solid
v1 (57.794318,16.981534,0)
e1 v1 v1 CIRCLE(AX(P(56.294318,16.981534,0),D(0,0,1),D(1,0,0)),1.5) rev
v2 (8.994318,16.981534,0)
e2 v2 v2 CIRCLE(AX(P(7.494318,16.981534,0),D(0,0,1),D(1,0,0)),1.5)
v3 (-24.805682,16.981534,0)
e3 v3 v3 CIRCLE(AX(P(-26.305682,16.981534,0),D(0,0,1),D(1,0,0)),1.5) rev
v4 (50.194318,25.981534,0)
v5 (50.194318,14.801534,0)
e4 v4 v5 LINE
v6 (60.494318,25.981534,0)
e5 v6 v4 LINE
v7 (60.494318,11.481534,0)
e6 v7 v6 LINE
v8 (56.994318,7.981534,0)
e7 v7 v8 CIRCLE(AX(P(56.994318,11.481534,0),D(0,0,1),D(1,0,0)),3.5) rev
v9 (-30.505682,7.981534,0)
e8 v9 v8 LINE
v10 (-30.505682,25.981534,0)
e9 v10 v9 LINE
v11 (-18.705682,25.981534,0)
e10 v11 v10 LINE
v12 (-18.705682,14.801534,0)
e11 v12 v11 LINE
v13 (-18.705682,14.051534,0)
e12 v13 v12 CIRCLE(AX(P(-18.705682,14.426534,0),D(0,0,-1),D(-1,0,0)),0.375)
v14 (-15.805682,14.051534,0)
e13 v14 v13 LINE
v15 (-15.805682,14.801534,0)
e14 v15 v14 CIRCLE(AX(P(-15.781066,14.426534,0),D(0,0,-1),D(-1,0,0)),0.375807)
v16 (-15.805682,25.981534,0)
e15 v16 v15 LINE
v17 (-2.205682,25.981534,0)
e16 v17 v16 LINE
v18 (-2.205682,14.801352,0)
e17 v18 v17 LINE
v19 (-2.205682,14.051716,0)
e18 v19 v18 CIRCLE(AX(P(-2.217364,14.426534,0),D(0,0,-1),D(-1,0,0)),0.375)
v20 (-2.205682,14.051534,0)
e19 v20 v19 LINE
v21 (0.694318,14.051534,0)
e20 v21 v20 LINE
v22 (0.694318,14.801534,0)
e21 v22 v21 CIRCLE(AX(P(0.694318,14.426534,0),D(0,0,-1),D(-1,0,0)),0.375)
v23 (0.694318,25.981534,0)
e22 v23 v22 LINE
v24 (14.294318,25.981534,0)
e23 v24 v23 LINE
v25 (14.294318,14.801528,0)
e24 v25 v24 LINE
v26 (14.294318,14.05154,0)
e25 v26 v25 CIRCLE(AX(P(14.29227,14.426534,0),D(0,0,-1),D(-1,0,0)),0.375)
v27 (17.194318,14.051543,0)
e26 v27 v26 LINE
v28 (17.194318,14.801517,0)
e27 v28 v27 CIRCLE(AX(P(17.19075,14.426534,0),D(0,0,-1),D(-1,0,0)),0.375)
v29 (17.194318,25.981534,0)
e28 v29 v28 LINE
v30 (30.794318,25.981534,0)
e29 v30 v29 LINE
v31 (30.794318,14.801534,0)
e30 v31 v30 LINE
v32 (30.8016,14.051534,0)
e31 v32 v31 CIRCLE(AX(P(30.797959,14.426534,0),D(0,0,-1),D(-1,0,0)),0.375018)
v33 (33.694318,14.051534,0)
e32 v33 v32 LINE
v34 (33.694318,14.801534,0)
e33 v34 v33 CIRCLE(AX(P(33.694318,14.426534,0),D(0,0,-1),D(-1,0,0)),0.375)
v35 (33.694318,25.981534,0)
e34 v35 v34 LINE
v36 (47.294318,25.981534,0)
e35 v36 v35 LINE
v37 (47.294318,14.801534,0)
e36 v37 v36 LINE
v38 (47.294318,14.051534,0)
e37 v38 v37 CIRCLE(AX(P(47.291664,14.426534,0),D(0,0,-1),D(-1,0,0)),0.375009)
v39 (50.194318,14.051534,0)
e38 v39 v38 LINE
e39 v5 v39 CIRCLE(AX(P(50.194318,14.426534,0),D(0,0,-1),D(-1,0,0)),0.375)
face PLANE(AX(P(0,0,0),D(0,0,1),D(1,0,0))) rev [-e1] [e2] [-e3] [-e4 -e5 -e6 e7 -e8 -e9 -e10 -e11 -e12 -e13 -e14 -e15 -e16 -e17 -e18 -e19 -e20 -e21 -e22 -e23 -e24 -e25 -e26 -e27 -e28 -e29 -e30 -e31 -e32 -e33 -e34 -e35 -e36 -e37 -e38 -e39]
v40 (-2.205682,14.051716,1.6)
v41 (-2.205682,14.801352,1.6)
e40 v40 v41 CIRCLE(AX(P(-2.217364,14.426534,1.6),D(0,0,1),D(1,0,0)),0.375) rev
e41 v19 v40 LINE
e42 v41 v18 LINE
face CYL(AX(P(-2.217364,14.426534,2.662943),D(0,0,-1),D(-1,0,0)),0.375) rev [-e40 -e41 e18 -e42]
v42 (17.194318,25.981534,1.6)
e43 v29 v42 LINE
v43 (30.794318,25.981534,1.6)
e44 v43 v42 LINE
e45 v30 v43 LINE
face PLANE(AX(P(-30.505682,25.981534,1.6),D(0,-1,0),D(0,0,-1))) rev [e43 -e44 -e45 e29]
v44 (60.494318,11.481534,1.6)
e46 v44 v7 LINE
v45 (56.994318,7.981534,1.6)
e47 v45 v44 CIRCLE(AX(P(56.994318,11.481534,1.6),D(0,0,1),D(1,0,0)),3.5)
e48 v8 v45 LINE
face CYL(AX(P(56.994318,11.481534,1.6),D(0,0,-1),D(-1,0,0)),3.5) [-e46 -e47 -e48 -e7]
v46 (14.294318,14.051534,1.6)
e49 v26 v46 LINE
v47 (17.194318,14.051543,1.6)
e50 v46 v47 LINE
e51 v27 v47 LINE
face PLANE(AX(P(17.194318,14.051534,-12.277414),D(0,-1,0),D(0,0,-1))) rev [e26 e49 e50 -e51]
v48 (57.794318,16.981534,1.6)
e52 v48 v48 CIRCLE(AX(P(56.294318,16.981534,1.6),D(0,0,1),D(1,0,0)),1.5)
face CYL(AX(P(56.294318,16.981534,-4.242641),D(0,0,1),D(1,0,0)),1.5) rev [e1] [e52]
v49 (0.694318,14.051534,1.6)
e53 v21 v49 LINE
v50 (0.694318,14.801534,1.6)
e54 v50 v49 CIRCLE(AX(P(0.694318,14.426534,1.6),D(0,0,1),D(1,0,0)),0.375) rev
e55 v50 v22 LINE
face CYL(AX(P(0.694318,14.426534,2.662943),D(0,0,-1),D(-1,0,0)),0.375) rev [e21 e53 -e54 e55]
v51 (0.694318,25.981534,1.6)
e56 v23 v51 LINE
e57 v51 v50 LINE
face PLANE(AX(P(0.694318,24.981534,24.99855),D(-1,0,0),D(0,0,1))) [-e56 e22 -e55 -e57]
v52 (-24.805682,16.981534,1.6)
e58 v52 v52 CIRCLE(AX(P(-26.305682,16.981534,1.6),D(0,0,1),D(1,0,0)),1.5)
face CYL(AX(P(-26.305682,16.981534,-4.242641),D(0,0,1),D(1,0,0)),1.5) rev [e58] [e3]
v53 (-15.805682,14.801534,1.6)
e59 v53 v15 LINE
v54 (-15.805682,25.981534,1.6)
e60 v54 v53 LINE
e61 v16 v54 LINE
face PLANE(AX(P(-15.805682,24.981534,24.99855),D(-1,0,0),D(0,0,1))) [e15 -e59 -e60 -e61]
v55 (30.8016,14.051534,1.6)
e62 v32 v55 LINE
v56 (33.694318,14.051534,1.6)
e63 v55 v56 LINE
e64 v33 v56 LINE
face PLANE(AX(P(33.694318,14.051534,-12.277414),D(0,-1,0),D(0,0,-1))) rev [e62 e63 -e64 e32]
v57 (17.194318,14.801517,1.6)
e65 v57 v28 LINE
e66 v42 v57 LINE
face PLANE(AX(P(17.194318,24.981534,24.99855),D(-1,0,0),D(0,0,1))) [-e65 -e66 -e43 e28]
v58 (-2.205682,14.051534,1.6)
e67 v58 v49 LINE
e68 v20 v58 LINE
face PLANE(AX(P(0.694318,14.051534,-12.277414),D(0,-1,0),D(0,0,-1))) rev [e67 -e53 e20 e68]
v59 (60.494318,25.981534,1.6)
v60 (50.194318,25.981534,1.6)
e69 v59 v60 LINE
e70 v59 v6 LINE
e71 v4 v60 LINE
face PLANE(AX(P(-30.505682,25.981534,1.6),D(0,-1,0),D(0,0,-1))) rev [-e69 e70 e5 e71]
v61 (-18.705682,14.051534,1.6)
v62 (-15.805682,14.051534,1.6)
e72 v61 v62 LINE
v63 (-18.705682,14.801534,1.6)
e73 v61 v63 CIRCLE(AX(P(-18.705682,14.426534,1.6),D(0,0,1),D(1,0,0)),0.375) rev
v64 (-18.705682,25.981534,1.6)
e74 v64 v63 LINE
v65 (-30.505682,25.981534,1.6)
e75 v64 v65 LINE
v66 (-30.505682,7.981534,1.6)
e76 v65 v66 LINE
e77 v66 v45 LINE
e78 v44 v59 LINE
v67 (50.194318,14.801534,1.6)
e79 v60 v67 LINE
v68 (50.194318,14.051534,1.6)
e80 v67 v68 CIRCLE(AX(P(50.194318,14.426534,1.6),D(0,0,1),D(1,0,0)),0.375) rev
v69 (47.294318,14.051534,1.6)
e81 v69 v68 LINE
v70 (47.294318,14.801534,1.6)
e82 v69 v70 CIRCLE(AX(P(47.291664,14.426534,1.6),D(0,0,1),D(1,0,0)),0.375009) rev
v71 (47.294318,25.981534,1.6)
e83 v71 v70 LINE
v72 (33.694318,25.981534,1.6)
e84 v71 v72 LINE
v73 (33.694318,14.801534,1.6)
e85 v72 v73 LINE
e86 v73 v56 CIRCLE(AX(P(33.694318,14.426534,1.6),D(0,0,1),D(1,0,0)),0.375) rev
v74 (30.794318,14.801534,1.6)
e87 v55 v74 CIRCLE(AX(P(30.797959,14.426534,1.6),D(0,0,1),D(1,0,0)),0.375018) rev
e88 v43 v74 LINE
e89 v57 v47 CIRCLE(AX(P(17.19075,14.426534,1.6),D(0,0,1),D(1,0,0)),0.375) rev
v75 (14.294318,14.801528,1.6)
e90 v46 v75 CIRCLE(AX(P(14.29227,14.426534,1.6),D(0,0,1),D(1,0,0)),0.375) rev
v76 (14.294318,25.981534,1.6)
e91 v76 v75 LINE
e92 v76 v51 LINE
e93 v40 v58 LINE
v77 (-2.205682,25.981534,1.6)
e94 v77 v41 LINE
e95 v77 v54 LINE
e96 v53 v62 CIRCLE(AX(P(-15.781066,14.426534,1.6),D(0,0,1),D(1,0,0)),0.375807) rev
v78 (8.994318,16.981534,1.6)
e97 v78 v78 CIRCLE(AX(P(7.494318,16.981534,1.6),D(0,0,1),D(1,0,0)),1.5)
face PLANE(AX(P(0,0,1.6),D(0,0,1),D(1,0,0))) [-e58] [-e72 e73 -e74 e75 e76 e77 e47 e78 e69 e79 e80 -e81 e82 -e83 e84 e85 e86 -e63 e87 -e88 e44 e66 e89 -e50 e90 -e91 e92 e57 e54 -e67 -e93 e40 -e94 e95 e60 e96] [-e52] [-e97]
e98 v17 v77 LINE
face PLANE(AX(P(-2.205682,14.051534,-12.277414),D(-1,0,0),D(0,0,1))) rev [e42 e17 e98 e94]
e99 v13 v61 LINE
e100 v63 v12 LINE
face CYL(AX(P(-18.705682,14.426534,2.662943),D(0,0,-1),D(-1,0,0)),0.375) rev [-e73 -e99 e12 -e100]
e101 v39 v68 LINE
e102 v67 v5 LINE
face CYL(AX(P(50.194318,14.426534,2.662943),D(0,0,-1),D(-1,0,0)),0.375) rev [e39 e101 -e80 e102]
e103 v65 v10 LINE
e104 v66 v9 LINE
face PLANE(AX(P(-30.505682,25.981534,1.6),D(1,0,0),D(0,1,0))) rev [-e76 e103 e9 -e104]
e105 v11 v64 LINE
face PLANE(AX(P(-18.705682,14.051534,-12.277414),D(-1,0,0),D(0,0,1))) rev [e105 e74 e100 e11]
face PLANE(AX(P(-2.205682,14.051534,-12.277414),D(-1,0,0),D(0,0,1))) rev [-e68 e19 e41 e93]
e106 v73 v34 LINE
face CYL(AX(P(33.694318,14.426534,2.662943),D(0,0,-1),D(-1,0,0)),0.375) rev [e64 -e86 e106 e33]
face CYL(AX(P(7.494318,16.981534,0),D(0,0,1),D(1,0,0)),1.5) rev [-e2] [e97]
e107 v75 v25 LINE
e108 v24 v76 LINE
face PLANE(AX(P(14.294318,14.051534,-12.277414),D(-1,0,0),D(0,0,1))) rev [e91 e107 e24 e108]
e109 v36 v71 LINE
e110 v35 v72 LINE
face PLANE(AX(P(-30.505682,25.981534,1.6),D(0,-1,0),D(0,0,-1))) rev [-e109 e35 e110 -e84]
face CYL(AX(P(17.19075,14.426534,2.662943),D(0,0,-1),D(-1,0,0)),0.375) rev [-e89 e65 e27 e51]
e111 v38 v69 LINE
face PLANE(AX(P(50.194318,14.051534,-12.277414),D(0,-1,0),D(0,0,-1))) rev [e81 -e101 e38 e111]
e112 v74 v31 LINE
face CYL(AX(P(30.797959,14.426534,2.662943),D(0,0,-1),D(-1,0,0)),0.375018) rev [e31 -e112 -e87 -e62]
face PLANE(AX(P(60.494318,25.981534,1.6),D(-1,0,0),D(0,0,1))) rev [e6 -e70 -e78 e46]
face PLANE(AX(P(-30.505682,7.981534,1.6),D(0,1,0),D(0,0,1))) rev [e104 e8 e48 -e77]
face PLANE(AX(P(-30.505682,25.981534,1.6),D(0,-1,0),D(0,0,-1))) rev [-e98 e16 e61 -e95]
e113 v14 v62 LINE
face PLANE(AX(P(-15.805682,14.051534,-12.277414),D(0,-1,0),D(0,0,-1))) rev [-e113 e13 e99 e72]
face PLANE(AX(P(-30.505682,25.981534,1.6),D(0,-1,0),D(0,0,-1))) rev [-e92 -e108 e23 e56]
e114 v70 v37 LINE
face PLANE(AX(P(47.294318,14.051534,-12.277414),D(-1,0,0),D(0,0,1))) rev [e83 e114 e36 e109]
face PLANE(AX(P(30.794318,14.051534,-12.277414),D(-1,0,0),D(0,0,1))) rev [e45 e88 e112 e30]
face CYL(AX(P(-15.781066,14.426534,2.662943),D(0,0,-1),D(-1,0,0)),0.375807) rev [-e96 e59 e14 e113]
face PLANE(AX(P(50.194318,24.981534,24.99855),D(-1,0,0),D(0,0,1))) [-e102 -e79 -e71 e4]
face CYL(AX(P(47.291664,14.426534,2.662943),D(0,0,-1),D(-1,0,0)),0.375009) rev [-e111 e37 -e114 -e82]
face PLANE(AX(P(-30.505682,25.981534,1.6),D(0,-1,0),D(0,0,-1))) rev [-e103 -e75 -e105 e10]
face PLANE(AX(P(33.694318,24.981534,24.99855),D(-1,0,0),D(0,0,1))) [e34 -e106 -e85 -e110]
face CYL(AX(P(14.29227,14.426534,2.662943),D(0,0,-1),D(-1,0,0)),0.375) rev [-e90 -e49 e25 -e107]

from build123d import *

# Parameters (mm, degrees)
SZKIC1_W                    = 91
SZKIC1_H                    = 18
DODANIE_WYCI_GNI_CIE1_DEPTH = 1.6
GNIAZDO1_START              = 14.181534091
GNIAZDO1_OUTLINE_W          = 1.6
GNIAZDO1_OUTLINE_H          = 1.6
GNIAZDO1_OUTLINE_W_2        = 2.8
GNIAZDO1_DEPTH              = 8.199061552
GNIAZDO1_START_2            = 23.132472539
GNIAZDO1_2_OUTLINE_W        = 1.6
GNIAZDO1_2_OUTLINE_H        = 1.598549721
GNIAZDO1_2_DEPTH            = 1.849061552
GNIAZDO1_START_3            = 14.151534091
GNIAZDO1_3_OUTLINE_W        = 1.2
GNIAZDO1_3_OUTLINE_H        = 1.6
GNIAZDO1_3_DEPTH            = 8.25
GNIAZDO1_START_4            = 20.480374091
GNIAZDO1_4_OUTLINE_W        = 1.6
GNIAZDO1_4_OUTLINE_H        = 0.001450279
GNIAZDO1_4_DEPTH            = 1.90116
GNIAZDO1_START_5            = -17.405681818
GNIAZDO1_5_DEPTH            = 1.6
GNIAZDO1_START_6            = -0.905681818
GNIAZDO1_6_DEPTH            = 1.6
GNIAZDO1_START_7            = 15.594318182
GNIAZDO1_7_DEPTH            = 1.6
GNIAZDO1_START_8            = 32.094318182
GNIAZDO1_8_DEPTH            = 1.6
GNIAZDO1_START_9            = 48.594318182
GNIAZDO1_9_DEPTH            = 1.6
GNIAZDO2_START              = 14.151534091
GNIAZDO2_OUTLINE_W          = 1.2
GNIAZDO2_OUTLINE_H          = 1.6
GNIAZDO2_DEPTH              = 8.25
SZKIC4_W                    = 2.7
SZKIC4_H                    = 11.83
WYTNIJ_WYCI_GNI_CIE1_DEPTH  = 1.6
ZAOKR_GLENIE1_R             = 3.5
SZKIC5_W                    = 2.9
SZKIC5_H                    = 11.93
WYTNIJ_WYCI_GNI_CIE2_DEPTH  = 1.6
SZKIC6_R                    = 1.5
WYTNIJ_WYCI_GNI_CIE5_DEPTH  = 1.6
SZKIC7_R                    = 1.5
WYTNIJ_WYCI_GNI_CIE4_DEPTH  = 66.857138155
SZKIC8_R                    = 0.375
SZKIC8_R_2                  = 0.375807067
SZKIC8_R_3                  = 0.375017675
SZKIC8_R_4                  = 0.375009396
WYTNIJ_WYCI_GNI_CIE6_DEPTH  = 1.6


with BuildPart() as part:
    # Szkic1 → Dodanie-wyciągnięcie1 (new body)
    with BuildSketch(Plane.XY):
        with Locations((14.994318182, 16.981534091)):
            Rectangle(SZKIC1_W, SZKIC1_H)
    extrude(amount=DODANIE_WYCI_GNI_CIE1_DEPTH)

    # Gniazdo1: read off the stored shape, not the designer's step
    # Gniazdo1 outline → Gniazdo1 (cut)
    with BuildSketch(Plane(origin=(0, 0, 0), x_dir=(1, 0, 0), z_dir=(0, 1, 0)).offset(GNIAZDO1_START)):
        with Locations((-16.605681818, -0.8)):
            Rectangle(GNIAZDO1_OUTLINE_W, GNIAZDO1_OUTLINE_H)
        with Locations((-0.705681818, -0.8)):
            Rectangle(GNIAZDO1_OUTLINE_W_2, GNIAZDO1_OUTLINE_H)
        with Locations((15.794318182, -0.8)):
            Rectangle(GNIAZDO1_OUTLINE_W_2, GNIAZDO1_OUTLINE_H)
        with Locations((32.294318182, -0.8)):
            Rectangle(GNIAZDO1_OUTLINE_W_2, GNIAZDO1_OUTLINE_H)
        with Locations((48.794318182, -0.8)):
            Rectangle(GNIAZDO1_OUTLINE_W_2, GNIAZDO1_OUTLINE_H)
    extrude(amount=GNIAZDO1_DEPTH, mode=Mode.SUBTRACT)

    # Gniazdo1 2 outline → Gniazdo1 2 (cut)
    with BuildSketch(Plane(origin=(0, 0, 0), x_dir=(1, 0, 0), z_dir=(0, 1, 0)).offset(GNIAZDO1_START_2)):
        with Locations((-16.605681818, -0.799274861)):
            Rectangle(GNIAZDO1_2_OUTLINE_W, GNIAZDO1_2_OUTLINE_H)
        with Locations((-0.105681818, -0.799274861)):
            Rectangle(GNIAZDO1_2_OUTLINE_W, GNIAZDO1_2_OUTLINE_H)
        with Locations((16.394318182, -0.799274861)):
            Rectangle(GNIAZDO1_2_OUTLINE_W, GNIAZDO1_2_OUTLINE_H)
        with Locations((32.894318182, -0.799274861)):
            Rectangle(GNIAZDO1_2_OUTLINE_W, GNIAZDO1_2_OUTLINE_H)
        with Locations((49.394318182, -0.799274861)):
            Rectangle(GNIAZDO1_2_OUTLINE_W, GNIAZDO1_2_OUTLINE_H)
    extrude(amount=GNIAZDO1_2_DEPTH, mode=Mode.SUBTRACT)

    # Gniazdo1 3 outline → Gniazdo1 3 (cut)
    with BuildSketch(Plane(origin=(0, 0, 0), x_dir=(1, 0, 0), z_dir=(0, 1, 0)).offset(GNIAZDO1_START_3)):
        with Locations((-1.505681818, -0.8)):
            Rectangle(GNIAZDO1_3_OUTLINE_W, GNIAZDO1_3_OUTLINE_H)
        with Locations((14.994318182, -0.8)):
            Rectangle(GNIAZDO1_3_OUTLINE_W, GNIAZDO1_3_OUTLINE_H)
        with Locations((31.494318182, -0.8)):
            Rectangle(GNIAZDO1_3_OUTLINE_W, GNIAZDO1_3_OUTLINE_H)
        with Locations((47.994318182, -0.8)):
            Rectangle(GNIAZDO1_3_OUTLINE_W, GNIAZDO1_3_OUTLINE_H)
    extrude(amount=GNIAZDO1_3_DEPTH, mode=Mode.SUBTRACT)

    # Gniazdo1 4 outline → Gniazdo1 4 (cut)
    with BuildSketch(Plane(origin=(0, 0, 0), x_dir=(1, 0, 0), z_dir=(0, 1, 0)).offset(GNIAZDO1_START_4)):
        with Locations((-16.605681818, -1.599274861)):
            Rectangle(GNIAZDO1_4_OUTLINE_W, GNIAZDO1_4_OUTLINE_H)
        with Locations((-0.105681818, -1.599274861)):
            Rectangle(GNIAZDO1_4_OUTLINE_W, GNIAZDO1_4_OUTLINE_H)
        with Locations((16.394318182, -1.599274861)):
            Rectangle(GNIAZDO1_4_OUTLINE_W, GNIAZDO1_4_OUTLINE_H)
        with Locations((32.894318182, -1.599274861)):
            Rectangle(GNIAZDO1_4_OUTLINE_W, GNIAZDO1_4_OUTLINE_H)
        with Locations((49.394318182, -1.599274861)):
            Rectangle(GNIAZDO1_4_OUTLINE_W, GNIAZDO1_4_OUTLINE_H)
    extrude(amount=GNIAZDO1_4_DEPTH, mode=Mode.SUBTRACT)

    # Gniazdo1 5 outline → Gniazdo1 5 (cut)
    with BuildSketch(Plane.YZ.offset(GNIAZDO1_START_5)):
        with BuildLine():
            Line((23.132472539, 1.598549721), (23.131534091, 1.598549721))
            ThreePointArc((23.131534091, 1.598549721), (23.132237853, 1.585284765), (23.132472539, 1.572003227))
            Line((23.132472539, 1.572003227), (23.132472539, 1.598549721))
        make_face()
        with BuildLine():
            Line((22.380595643, 1.598549721), (22.380595643, 1.572003227))
            ThreePointArc((22.380595643, 1.572003227), (22.380830329, 1.585284765), (22.381534091, 1.598549721))
            Line((22.381534091, 1.598549721), (22.380595643, 1.598549721))
        make_face()
        with BuildLine():
            Line((23.132472539, 0), (23.132472539, 1.572003227))
            ThreePointArc((23.132472539, 1.572003227), (22.756534091, 1.196064779), (22.380595643, 1.572003227))
            Line((22.380595643, 1.572003227), (22.380595643, 0))
            Line((22.380595643, 0), (23.132472539, 0))
        make_face()
    extrude(amount=GNIAZDO1_5_DEPTH, mode=Mode.SUBTRACT)

    # Gniazdo1 6 outline → Gniazdo1 6 (cut)
    with BuildSketch(Plane.YZ.offset(GNIAZDO1_START_6)):
        with BuildLine():
            Line((23.132472539, 1.598549721), (23.131534091, 1.598549721))
            ThreePointArc((23.131534091, 1.598549721), (23.132237853, 1.585284765), (23.132472539, 1.572003227))
            Line((23.132472539, 1.572003227), (23.132472539, 1.598549721))
        make_face()
        with BuildLine():
            Line((22.380595643, 1.598549721), (22.380595643, 1.572003227))
            ThreePointArc((22.380595643, 1.572003227), (22.380830329, 1.585284765), (22.381534091, 1.598549721))
            Line((22.381534091, 1.598549721), (22.380595643, 1.598549721))
        make_face()
        with BuildLine():
            Line((23.132472539, 0), (23.132472539, 1.572003227))
            ThreePointArc((23.132472539, 1.572003227), (22.756534091, 1.196064779), (22.380595643, 1.572003227))
            Line((22.380595643, 1.572003227), (22.380595643, 0))
            Line((22.380595643, 0), (23.132472539, 0))
        make_face()
    extrude(amount=GNIAZDO1_6_DEPTH, mode=Mode.SUBTRACT)

    # Gniazdo1 7 outline → Gniazdo1 7 (cut)
    with BuildSketch(Plane.YZ.offset(GNIAZDO1_START_7)):
        with BuildLine():
            Line((23.132472539, 1.598549721), (23.131534091, 1.598549721))
            ThreePointArc((23.131534091, 1.598549721), (23.132237853, 1.585284765), (23.132472539, 1.572003227))
            Line((23.132472539, 1.572003227), (23.132472539, 1.598549721))
        make_face()
        with BuildLine():
            Line((22.380595643, 1.598549721), (22.380595643, 1.572003227))
            ThreePointArc((22.380595643, 1.572003227), (22.380830329, 1.585284765), (22.381534091, 1.598549721))
            Line((22.381534091, 1.598549721), (22.380595643, 1.598549721))
        make_face()
        with BuildLine():
            Line((23.132472539, 0), (23.132472539, 1.572003227))
            ThreePointArc((23.132472539, 1.572003227), (22.756534091, 1.196064779), (22.380595643, 1.572003227))
            Line((22.380595643, 1.572003227), (22.380595643, 0))
            Line((22.380595643, 0), (23.132472539, 0))
        make_face()
    extrude(amount=GNIAZDO1_7_DEPTH, mode=Mode.SUBTRACT)

    # Gniazdo1 8 outline → Gniazdo1 8 (cut)
    with BuildSketch(Plane.YZ.offset(GNIAZDO1_START_8)):
        with BuildLine():
            Line((23.132472539, 1.598549721), (23.131534091, 1.598549721))
            ThreePointArc((23.131534091, 1.598549721), (23.132237853, 1.585284765), (23.132472539, 1.572003227))
            Line((23.132472539, 1.572003227), (23.132472539, 1.598549721))
        make_face()
        with BuildLine():
            Line((22.380595643, 1.598549721), (22.380595643, 1.572003227))
            ThreePointArc((22.380595643, 1.572003227), (22.380830329, 1.585284765), (22.381534091, 1.598549721))
            Line((22.381534091, 1.598549721), (22.380595643, 1.598549721))
        make_face()
        with BuildLine():
            Line((23.132472539, 0), (23.132472539, 1.572003227))
            ThreePointArc((23.132472539, 1.572003227), (22.756534091, 1.196064779), (22.380595643, 1.572003227))
            Line((22.380595643, 1.572003227), (22.380595643, 0))
            Line((22.380595643, 0), (23.132472539, 0))
        make_face()
    extrude(amount=GNIAZDO1_8_DEPTH, mode=Mode.SUBTRACT)

    # Gniazdo1 9 outline → Gniazdo1 9 (cut)
    with BuildSketch(Plane.YZ.offset(GNIAZDO1_START_9)):
        with BuildLine():
            Line((23.132472539, 1.598549721), (23.131534091, 1.598549721))
            ThreePointArc((23.131534091, 1.598549721), (23.132237853, 1.585284765), (23.132472539, 1.572003227))
            Line((23.132472539, 1.572003227), (23.132472539, 1.598549721))
        make_face()
        with BuildLine():
            Line((22.380595643, 1.598549721), (22.380595643, 1.572003227))
            ThreePointArc((22.380595643, 1.572003227), (22.380830329, 1.585284765), (22.381534091, 1.598549721))
            Line((22.381534091, 1.598549721), (22.380595643, 1.598549721))
        make_face()
        with BuildLine():
            Line((23.132472539, 0), (23.132472539, 1.572003227))
            ThreePointArc((23.132472539, 1.572003227), (22.756534091, 1.196064779), (22.380595643, 1.572003227))
            Line((22.380595643, 1.572003227), (22.380595643, 0))
            Line((22.380595643, 0), (23.132472539, 0))
        make_face()
    extrude(amount=GNIAZDO1_9_DEPTH, mode=Mode.SUBTRACT)

    # Gniazdo2: read off the stored shape, not the designer's step
    # Gniazdo2 outline → Gniazdo2 (cut)
    with BuildSketch(Plane(origin=(0, 0, 0), x_dir=(1, 0, 0), z_dir=(0, 1, 0)).offset(GNIAZDO2_START)):
        with Locations((-18.005681818, -0.8)):
            Rectangle(GNIAZDO2_OUTLINE_W, GNIAZDO2_OUTLINE_H)
    extrude(amount=GNIAZDO2_DEPTH, mode=Mode.SUBTRACT)

    # Szkic4 → Wytnij-wyciągnięcie1 (cut)
    with BuildSketch(Plane.XY.offset(1.6)):
        with Locations((-17.255681818, 20.066534091)):
            Rectangle(SZKIC4_W, SZKIC4_H)
        with Locations((-0.755681818, 20.066534091)):
            Rectangle(SZKIC4_W, SZKIC4_H)
        with Locations((15.744318182, 20.066534091)):
            Rectangle(SZKIC4_W, SZKIC4_H)
        with Locations((32.244318182, 20.066534091)):
            Rectangle(SZKIC4_W, SZKIC4_H)
        with Locations((48.744318182, 20.066534091)):
            Rectangle(SZKIC4_W, SZKIC4_H)
    extrude(amount=-WYTNIJ_WYCI_GNI_CIE1_DEPTH, mode=Mode.SUBTRACT)

    # Zaokrąglenie1
    zaokr_glenie1_edges = [part.edges().sort_by_distance(p)[0] for p in [
        (60.494318182, 7.981534091, 0.8),
    ]]
    fillet(zaokr_glenie1_edges, radius=ZAOKR_GLENIE1_R)

    # Szkic5 → Wytnij-wyciągnięcie2 (cut)
    with BuildSketch(Plane.XY.offset(1.6)):
        with Locations((48.744318182, 20.016534091)):
            Rectangle(SZKIC5_W, SZKIC5_H)
        with Locations((32.244318182, 20.016534091)):
            Rectangle(SZKIC5_W, SZKIC5_H)
        with Locations((15.744318182, 20.016534091)):
            Rectangle(SZKIC5_W, SZKIC5_H)
        with Locations((-0.755681818, 20.016534091)):
            Rectangle(SZKIC5_W, SZKIC5_H)
        with Locations((-17.255681818, 20.016534091)):
            Rectangle(SZKIC5_W, SZKIC5_H)
    extrude(amount=-WYTNIJ_WYCI_GNI_CIE2_DEPTH, mode=Mode.SUBTRACT)

    # Szkic6 → Wytnij-wyciągnięcie5 (cut)
    with BuildSketch(Plane.XY.offset(1.6)):
        with Locations((56.294318182, 16.981534091)):
            Circle(SZKIC6_R)
        with Locations((-26.305681818, 16.981534091)):
            Circle(SZKIC6_R)
    extrude(amount=-WYTNIJ_WYCI_GNI_CIE5_DEPTH, mode=Mode.SUBTRACT)

    # Szkic7 → Wytnij-wyciągnięcie4 (cut, through all)
    with BuildSketch(Plane.XY.offset(1.6)):
        with Locations((7.494318182, 16.981534091)):
            Circle(SZKIC7_R)
    extrude(amount=-WYTNIJ_WYCI_GNI_CIE4_DEPTH, mode=Mode.SUBTRACT)

    # Szkic8 → Wytnij-wyciągnięcie6 (cut)
    with BuildSketch(Plane(origin=(0, 0, 0), x_dir=(-1, 0, 0), z_dir=(0, 0, -1))):
        with Locations((18.705681818, 14.426534091)):
            Circle(SZKIC8_R)
        with Locations((15.781065738, 14.426534091)):
            Circle(SZKIC8_R_2)
        with Locations((2.217363992, 14.426534091)):
            Circle(SZKIC8_R)
        with Locations((-0.694318182, 14.426534091)):
            Circle(SZKIC8_R)
        with Locations((-14.292270167, 14.426534091)):
            Circle(SZKIC8_R)
        with Locations((-17.190750174, 14.426534091)):
            Circle(SZKIC8_R)
        with Locations((-30.797959124, 14.426534091)):
            Circle(SZKIC8_R_3)
        with Locations((-33.694318182, 14.426534091)):
            Circle(SZKIC8_R)
        with Locations((-47.291663502, 14.426534091)):
            Circle(SZKIC8_R_4)
        with Locations((-50.194318182, 14.426534091)):
            Circle(SZKIC8_R)
    extrude(amount=-WYTNIJ_WYCI_GNI_CIE6_DEPTH, mode=Mode.SUBTRACT)


solid = part.part
